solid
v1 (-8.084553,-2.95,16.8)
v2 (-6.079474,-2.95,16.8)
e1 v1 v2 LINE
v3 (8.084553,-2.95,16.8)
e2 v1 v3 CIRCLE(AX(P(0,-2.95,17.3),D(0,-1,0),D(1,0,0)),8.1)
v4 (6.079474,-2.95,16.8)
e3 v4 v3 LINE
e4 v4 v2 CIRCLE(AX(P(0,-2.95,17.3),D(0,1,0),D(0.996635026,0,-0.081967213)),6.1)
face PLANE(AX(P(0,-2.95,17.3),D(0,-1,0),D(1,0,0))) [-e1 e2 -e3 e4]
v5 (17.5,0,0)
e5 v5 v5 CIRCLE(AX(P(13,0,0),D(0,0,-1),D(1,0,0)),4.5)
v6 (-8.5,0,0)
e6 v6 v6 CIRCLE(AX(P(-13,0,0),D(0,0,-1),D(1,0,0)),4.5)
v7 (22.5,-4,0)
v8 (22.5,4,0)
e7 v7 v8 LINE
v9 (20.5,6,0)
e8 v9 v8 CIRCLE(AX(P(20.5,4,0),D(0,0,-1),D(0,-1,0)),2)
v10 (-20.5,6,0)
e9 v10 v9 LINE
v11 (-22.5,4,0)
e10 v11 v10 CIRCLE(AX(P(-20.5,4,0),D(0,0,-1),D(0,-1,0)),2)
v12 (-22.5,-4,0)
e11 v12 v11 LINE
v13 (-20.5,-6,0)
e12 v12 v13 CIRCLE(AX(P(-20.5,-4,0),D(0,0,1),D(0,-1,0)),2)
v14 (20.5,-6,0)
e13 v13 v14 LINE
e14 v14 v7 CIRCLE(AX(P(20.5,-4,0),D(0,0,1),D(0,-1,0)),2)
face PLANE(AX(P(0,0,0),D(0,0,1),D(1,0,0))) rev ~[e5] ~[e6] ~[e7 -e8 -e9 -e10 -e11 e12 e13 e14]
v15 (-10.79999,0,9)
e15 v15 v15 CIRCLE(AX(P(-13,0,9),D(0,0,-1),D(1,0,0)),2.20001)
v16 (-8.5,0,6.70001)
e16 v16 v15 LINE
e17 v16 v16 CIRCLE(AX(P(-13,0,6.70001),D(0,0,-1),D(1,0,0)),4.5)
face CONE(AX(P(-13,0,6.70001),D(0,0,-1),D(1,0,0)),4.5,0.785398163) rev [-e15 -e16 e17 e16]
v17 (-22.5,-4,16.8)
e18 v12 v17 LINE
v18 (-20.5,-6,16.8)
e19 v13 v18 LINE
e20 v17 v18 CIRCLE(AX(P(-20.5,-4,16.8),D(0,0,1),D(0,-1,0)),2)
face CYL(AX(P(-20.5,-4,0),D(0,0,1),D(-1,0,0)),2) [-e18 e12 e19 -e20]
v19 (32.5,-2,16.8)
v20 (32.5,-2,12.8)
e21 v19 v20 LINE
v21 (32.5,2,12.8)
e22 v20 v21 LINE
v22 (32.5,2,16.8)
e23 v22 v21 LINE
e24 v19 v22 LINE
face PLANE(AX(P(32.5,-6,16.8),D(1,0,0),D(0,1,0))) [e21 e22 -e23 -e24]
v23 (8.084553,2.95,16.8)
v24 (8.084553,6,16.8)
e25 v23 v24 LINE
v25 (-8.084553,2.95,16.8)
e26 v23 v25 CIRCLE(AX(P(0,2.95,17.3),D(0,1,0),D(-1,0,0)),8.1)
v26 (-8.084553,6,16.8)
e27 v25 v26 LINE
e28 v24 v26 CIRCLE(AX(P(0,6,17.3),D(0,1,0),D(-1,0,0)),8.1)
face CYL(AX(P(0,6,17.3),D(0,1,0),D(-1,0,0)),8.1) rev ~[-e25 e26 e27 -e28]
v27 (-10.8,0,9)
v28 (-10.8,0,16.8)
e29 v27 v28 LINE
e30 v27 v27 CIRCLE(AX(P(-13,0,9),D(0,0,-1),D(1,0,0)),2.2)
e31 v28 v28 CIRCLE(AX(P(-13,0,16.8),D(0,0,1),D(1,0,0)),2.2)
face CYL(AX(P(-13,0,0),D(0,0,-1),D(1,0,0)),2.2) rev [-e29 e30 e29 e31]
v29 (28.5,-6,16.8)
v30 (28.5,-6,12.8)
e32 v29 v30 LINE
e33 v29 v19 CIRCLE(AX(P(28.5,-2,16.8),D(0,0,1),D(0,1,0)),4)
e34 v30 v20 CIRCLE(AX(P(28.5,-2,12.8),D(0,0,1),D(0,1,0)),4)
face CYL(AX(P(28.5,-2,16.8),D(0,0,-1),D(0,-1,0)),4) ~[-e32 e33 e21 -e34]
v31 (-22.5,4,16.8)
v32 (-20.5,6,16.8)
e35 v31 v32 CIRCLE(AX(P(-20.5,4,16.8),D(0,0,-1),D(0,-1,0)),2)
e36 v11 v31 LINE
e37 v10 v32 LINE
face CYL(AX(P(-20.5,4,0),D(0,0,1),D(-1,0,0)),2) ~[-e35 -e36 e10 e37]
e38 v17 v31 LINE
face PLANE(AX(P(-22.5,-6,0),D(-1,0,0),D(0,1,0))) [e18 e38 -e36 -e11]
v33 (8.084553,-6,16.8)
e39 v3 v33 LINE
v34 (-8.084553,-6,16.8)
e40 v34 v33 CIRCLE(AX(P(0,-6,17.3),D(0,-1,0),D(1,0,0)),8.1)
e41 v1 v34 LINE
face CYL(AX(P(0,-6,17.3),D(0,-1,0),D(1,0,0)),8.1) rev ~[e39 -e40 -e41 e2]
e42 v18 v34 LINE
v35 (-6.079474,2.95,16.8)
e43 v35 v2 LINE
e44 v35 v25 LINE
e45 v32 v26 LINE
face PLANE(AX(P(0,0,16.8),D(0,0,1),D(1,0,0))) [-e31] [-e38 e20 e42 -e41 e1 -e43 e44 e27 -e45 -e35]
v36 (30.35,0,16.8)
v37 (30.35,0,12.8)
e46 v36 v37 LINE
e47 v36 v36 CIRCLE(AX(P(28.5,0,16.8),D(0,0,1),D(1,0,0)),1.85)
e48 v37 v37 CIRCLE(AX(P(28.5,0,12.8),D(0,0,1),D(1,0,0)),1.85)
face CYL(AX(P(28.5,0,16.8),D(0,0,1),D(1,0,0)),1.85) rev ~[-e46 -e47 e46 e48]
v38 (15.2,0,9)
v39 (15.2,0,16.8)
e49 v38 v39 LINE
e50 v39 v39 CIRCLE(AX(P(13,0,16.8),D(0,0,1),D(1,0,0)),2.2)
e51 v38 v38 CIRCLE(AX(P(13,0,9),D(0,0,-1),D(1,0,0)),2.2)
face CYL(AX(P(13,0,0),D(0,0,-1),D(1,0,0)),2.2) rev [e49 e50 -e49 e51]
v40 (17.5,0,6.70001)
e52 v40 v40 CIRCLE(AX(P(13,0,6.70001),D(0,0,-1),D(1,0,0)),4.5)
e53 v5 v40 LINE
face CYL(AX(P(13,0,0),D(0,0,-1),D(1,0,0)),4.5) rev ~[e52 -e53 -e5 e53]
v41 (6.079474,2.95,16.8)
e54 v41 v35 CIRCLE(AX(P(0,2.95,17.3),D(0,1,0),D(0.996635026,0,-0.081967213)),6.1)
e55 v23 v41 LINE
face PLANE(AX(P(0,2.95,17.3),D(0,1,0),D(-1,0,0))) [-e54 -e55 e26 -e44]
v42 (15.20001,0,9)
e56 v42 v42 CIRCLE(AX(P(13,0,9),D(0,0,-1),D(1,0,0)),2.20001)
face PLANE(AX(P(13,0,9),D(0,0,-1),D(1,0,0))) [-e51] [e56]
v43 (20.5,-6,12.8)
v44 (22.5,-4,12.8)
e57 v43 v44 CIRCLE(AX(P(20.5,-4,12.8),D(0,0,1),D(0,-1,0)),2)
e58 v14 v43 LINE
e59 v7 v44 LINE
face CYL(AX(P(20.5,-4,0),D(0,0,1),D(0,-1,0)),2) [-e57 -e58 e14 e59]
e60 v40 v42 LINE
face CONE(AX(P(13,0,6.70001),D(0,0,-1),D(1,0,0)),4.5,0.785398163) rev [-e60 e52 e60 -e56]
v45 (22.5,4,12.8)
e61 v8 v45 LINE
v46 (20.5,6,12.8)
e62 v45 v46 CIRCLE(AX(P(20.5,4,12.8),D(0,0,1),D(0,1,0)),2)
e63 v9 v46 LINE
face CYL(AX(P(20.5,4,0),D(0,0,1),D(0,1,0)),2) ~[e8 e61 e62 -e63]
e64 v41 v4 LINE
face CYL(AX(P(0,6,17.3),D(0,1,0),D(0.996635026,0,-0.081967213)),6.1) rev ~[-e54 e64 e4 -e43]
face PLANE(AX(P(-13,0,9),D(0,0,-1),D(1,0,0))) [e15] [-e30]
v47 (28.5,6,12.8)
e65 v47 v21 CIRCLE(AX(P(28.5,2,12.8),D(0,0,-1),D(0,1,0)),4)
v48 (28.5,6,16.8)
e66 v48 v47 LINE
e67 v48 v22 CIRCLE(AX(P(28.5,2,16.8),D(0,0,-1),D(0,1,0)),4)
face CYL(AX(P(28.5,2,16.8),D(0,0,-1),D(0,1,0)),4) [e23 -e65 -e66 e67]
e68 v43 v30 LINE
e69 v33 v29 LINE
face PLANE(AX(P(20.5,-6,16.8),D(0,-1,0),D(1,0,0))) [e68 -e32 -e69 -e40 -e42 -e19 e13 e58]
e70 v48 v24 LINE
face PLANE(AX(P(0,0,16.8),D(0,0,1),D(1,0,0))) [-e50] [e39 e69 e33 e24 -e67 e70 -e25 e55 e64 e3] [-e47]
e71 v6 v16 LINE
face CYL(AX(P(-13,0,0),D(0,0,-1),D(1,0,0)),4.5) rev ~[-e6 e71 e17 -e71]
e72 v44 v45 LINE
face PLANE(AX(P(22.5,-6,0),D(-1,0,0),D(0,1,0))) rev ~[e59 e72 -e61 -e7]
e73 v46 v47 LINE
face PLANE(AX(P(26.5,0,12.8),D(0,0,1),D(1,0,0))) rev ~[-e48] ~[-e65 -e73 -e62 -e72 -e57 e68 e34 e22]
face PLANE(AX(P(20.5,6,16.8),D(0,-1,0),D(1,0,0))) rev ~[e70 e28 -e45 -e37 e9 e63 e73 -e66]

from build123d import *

# Parameters (mm, degrees)
F0_W      = 45
F0_H      = 12
F0_R      = 2.2
F1_DEPTH  = 16.8
F3_DEPTH  = 12.001
F4_R      = 8.1
F5_DEPTH  = 3.05
F6_R      = 8.1
F7_DEPTH  = 3.05
F8_R      = 4.5
F8_R_2    = 2.2
F9_DEPTH  = 9
F10_SIZE  = 2.29999
F11_R     = 2
F12_W     = 12
F12_H     = 12
F12_R     = 1.85
F13_DEPTH = 4
F14_R     = 4


# Not quite as in the source:
# - a fillet or chamfer is up to 0.001 mm smaller than in the source, because OpenCascade refuses the exact size


with BuildPart() as f1:
    # F0 (on Top) → F1 (new body)
    with BuildSketch(Plane.XY):
        Rectangle(F0_W, F0_H)
        with Locations((-13, 0)):
            Circle(F0_R, mode=Mode.SUBTRACT)
        with Locations((13, 0)):
            Circle(F0_R, mode=Mode.SUBTRACT)
    extrude(amount=F1_DEPTH)

    # F2 (on face) → F3 (cut, through all)
    with BuildSketch(Plane(origin=(0, 6, 0), x_dir=(-1, 0, 0), z_dir=(0, 1, 0))):
        with BuildLine():
            ThreePointArc((-6.0794736614, 16.8), (0, 11.2), (6.0794736614, 16.8))
            Line((6.0794736614, 16.8), (-6.0794736614, 16.8))
        make_face()
        with BuildLine():
            Line((-6.0794736614, 16.8), (6.0794736614, 16.8))
            ThreePointArc((6.0794736614, 16.8), (6.0948662551, 17.0497894234), (6.1, 17.3))
            ThreePointArc((6.1, 17.3), (-0.2502105766, 23.3948662551), (-6.0794736614, 16.8))
        make_face()
    extrude(amount=-F3_DEPTH, mode=Mode.SUBTRACT)

    # F4 (on face) → F5 (cut)
    with BuildSketch(Plane(origin=(0, 6, 0), x_dir=(-1, 0, 0), z_dir=(0, 1, 0))):
        with Locations((0, 17.3)):
            Circle(F4_R)
    extrude(amount=-F5_DEPTH, mode=Mode.SUBTRACT)

    # F6 (on face) → F7 (cut)
    with BuildSketch(Plane.XZ.offset(6)):
        with Locations((0, 17.3)):
            Circle(F6_R)
    extrude(amount=-F7_DEPTH, mode=Mode.SUBTRACT)

    # F8 (on face) → F9 (cut)
    with BuildSketch(Plane(origin=(0, 0, 0), x_dir=(1, 0, 0), z_dir=(0, 0, -1))):
        with Locations((-13, 0)):
            Circle(F8_R)
        with Locations((-13, 0)):
            Circle(F8_R_2, mode=Mode.SUBTRACT)
        with Locations((13, 0)):
            Circle(F8_R)
        with Locations((13, 0)):
            Circle(F8_R_2, mode=Mode.SUBTRACT)
    extrude(amount=-F9_DEPTH, mode=Mode.SUBTRACT)

    # F10 (size 2.3 in the source; OpenCascade refuses exactly that, so slightly less here)
    f10_edges = [f1.edges().sort_by_distance(p)[0] for p in [
        (-17.5, 0, 9),
        (8.5, 0, 9),
    ]]
    chamfer(f10_edges, length=F10_SIZE)

    # F11
    f11_edges = [f1.edges().sort_by_distance(p)[0] for p in [
        (22.5, -6, 8.4),
        (-22.5, -6, 8.4),
        (22.5, 6, 8.4),
        (-22.5, 6, 8.4),
    ]]
    fillet(f11_edges, radius=F11_R)

    # F12 (on face) → F13 (join)
    with BuildSketch(Plane.XY.offset(16.8)):
        with Locations((26.5, 0)):
            Rectangle(F12_W, F12_H)
        with Locations((28.5, 0)):
            Circle(F12_R, mode=Mode.SUBTRACT)
    extrude(amount=-F13_DEPTH)

    # F14
    f14_edges = [f1.edges().sort_by_distance(p)[0] for p in [
        (32.5, -6, 14.8),
        (32.5, 6, 14.8),
    ]]
    fillet(f14_edges, radius=F14_R)


solid = f1.part
